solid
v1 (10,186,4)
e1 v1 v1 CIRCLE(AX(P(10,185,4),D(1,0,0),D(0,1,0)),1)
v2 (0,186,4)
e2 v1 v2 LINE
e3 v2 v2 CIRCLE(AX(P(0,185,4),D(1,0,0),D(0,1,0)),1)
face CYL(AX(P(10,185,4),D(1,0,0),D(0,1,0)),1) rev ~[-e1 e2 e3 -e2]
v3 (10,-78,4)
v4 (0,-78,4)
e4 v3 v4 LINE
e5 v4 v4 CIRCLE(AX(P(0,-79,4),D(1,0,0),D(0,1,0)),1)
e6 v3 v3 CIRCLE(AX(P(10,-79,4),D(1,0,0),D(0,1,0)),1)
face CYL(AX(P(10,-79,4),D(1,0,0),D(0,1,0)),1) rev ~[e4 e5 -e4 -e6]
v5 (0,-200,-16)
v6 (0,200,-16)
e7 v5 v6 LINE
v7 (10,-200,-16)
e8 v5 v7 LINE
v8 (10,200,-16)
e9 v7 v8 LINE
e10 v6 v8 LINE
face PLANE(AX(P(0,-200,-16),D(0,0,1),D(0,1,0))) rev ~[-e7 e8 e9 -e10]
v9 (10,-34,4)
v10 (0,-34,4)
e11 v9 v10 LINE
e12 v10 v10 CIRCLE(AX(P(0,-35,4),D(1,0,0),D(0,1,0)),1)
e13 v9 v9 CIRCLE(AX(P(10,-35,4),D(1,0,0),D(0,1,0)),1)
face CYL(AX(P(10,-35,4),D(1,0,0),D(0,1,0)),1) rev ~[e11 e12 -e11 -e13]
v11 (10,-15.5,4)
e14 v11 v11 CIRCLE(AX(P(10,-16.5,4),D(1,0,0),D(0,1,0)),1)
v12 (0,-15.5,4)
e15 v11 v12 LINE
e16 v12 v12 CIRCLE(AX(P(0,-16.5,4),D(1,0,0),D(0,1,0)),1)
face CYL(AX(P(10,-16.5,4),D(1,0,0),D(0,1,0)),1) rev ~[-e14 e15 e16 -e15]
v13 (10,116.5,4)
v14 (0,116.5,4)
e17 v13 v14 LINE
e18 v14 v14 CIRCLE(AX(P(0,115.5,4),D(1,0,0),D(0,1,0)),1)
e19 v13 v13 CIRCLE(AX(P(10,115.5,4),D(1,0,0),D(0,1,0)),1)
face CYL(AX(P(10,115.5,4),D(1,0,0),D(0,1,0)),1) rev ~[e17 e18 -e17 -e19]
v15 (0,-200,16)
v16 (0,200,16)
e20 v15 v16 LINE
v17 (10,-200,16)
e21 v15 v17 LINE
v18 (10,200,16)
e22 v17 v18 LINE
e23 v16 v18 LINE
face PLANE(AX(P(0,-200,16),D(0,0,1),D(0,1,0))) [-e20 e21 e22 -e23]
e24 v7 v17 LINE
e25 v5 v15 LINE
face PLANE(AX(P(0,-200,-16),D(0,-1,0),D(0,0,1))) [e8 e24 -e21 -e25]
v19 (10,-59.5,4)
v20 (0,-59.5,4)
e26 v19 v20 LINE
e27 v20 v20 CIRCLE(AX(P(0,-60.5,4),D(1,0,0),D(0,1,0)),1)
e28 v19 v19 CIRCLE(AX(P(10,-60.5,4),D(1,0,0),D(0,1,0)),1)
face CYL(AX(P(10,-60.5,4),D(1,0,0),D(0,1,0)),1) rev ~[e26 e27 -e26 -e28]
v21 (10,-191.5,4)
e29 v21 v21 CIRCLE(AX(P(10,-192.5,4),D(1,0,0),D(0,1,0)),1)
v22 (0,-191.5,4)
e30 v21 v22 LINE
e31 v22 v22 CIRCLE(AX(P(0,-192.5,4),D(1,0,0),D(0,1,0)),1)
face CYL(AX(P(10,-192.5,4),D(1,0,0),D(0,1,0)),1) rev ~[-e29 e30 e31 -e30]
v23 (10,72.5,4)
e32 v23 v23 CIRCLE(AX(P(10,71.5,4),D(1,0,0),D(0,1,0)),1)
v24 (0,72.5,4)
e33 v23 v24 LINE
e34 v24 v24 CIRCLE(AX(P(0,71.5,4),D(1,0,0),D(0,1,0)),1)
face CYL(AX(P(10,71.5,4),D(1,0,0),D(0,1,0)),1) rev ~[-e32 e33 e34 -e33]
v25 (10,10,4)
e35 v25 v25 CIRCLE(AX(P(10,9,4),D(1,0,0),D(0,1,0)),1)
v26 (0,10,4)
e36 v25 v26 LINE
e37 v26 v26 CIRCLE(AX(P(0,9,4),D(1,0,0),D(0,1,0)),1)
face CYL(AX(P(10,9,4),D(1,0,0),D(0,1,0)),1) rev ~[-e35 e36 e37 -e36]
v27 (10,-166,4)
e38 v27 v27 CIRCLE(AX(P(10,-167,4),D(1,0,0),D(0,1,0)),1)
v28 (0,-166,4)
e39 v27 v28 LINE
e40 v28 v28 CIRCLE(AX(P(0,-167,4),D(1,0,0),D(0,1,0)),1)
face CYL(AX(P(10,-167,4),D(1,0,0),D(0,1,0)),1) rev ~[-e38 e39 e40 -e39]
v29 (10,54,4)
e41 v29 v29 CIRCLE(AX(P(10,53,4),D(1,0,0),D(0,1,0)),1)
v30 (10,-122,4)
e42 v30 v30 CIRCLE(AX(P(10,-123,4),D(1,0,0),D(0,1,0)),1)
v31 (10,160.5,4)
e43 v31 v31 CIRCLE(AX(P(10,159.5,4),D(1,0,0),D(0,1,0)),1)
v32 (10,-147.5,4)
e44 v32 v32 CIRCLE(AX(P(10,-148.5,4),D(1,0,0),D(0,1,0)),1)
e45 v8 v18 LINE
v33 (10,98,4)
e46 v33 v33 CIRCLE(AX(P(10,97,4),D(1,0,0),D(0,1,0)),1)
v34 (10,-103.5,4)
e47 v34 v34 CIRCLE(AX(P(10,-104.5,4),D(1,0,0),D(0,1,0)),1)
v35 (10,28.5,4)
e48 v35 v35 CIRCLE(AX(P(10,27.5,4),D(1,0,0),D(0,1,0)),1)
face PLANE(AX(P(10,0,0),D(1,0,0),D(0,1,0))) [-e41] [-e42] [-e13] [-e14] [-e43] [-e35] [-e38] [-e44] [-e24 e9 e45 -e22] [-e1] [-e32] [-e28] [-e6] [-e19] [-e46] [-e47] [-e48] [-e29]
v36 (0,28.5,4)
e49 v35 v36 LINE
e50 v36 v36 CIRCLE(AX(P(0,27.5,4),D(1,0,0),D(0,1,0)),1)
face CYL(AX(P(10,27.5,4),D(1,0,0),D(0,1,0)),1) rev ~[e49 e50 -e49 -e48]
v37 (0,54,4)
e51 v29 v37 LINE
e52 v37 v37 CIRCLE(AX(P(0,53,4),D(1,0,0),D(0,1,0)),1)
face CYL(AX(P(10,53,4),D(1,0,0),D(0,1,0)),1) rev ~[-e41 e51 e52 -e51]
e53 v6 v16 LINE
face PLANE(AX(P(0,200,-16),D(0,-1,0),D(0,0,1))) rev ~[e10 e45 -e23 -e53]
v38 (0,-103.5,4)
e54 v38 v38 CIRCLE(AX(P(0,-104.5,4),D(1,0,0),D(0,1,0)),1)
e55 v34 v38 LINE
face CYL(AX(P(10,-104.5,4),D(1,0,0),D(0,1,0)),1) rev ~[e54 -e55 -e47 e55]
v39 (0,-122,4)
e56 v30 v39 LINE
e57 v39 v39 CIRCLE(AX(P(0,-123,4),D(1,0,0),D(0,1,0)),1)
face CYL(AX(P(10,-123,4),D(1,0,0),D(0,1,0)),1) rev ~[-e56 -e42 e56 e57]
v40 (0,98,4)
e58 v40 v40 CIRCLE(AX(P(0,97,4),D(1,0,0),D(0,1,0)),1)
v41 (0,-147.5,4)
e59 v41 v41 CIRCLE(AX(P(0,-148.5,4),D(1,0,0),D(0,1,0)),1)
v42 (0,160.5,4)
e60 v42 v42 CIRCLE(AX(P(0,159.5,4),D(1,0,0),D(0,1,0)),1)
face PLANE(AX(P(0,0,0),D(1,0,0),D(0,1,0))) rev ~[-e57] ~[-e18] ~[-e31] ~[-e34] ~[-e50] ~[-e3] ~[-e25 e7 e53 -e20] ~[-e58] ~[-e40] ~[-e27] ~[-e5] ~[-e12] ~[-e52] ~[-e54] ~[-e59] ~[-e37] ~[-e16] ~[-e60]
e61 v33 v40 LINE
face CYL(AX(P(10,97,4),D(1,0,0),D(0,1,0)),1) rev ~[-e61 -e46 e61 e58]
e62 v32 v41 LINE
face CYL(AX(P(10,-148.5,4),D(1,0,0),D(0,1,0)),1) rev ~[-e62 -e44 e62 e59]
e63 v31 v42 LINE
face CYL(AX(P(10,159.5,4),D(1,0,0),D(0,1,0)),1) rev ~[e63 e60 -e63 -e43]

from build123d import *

# Parameters (mm, degrees)
F0_W     = 400
F0_H     = 32
F1_DEPTH = 10
F2_R     = 1
F3_DEPTH = 25


# Not quite as in the source:
# - a feature names something its author has since deleted; it is built from what else it names


with BuildPart() as f1:
    # F0 (on Right) → F1 (new body)
    with BuildSketch(Plane.YZ):
        Rectangle(F0_W, F0_H)
    extrude(amount=F1_DEPTH)

    # F2 (on face) → F3 (cut)
    with BuildSketch(Plane.YZ.offset(10)):
        with Locations((-192.5, 4)):
            Circle(F2_R)
        with Locations((-167, 4)):
            Circle(F2_R)
        with Locations((-148.5, 4)):
            Circle(F2_R)
        with Locations((-123, 4)):
            Circle(F2_R)
        with Locations((-104.5, 4)):
            Circle(F2_R)
        with Locations((-79, 4)):
            Circle(F2_R)
        with Locations((-60.5, 4)):
            Circle(F2_R)
        with Locations((-35, 4)):
            Circle(F2_R)
        with Locations((-16.5, 4)):
            Circle(F2_R)
        with Locations((9, 4)):
            Circle(F2_R)
        with Locations((27.5, 4)):
            Circle(F2_R)
        with Locations((53, 4)):
            Circle(F2_R)
        with Locations((71.5, 4)):
            Circle(F2_R)
        with Locations((97, 4)):
            Circle(F2_R)
        with Locations((115.5, 4)):
            Circle(F2_R)
        with Locations((159.5, 4)):
            Circle(F2_R)
        with Locations((185, 4)):
            Circle(F2_R)
    extrude(amount=-F3_DEPTH, mode=Mode.SUBTRACT)


solid = f1.part
